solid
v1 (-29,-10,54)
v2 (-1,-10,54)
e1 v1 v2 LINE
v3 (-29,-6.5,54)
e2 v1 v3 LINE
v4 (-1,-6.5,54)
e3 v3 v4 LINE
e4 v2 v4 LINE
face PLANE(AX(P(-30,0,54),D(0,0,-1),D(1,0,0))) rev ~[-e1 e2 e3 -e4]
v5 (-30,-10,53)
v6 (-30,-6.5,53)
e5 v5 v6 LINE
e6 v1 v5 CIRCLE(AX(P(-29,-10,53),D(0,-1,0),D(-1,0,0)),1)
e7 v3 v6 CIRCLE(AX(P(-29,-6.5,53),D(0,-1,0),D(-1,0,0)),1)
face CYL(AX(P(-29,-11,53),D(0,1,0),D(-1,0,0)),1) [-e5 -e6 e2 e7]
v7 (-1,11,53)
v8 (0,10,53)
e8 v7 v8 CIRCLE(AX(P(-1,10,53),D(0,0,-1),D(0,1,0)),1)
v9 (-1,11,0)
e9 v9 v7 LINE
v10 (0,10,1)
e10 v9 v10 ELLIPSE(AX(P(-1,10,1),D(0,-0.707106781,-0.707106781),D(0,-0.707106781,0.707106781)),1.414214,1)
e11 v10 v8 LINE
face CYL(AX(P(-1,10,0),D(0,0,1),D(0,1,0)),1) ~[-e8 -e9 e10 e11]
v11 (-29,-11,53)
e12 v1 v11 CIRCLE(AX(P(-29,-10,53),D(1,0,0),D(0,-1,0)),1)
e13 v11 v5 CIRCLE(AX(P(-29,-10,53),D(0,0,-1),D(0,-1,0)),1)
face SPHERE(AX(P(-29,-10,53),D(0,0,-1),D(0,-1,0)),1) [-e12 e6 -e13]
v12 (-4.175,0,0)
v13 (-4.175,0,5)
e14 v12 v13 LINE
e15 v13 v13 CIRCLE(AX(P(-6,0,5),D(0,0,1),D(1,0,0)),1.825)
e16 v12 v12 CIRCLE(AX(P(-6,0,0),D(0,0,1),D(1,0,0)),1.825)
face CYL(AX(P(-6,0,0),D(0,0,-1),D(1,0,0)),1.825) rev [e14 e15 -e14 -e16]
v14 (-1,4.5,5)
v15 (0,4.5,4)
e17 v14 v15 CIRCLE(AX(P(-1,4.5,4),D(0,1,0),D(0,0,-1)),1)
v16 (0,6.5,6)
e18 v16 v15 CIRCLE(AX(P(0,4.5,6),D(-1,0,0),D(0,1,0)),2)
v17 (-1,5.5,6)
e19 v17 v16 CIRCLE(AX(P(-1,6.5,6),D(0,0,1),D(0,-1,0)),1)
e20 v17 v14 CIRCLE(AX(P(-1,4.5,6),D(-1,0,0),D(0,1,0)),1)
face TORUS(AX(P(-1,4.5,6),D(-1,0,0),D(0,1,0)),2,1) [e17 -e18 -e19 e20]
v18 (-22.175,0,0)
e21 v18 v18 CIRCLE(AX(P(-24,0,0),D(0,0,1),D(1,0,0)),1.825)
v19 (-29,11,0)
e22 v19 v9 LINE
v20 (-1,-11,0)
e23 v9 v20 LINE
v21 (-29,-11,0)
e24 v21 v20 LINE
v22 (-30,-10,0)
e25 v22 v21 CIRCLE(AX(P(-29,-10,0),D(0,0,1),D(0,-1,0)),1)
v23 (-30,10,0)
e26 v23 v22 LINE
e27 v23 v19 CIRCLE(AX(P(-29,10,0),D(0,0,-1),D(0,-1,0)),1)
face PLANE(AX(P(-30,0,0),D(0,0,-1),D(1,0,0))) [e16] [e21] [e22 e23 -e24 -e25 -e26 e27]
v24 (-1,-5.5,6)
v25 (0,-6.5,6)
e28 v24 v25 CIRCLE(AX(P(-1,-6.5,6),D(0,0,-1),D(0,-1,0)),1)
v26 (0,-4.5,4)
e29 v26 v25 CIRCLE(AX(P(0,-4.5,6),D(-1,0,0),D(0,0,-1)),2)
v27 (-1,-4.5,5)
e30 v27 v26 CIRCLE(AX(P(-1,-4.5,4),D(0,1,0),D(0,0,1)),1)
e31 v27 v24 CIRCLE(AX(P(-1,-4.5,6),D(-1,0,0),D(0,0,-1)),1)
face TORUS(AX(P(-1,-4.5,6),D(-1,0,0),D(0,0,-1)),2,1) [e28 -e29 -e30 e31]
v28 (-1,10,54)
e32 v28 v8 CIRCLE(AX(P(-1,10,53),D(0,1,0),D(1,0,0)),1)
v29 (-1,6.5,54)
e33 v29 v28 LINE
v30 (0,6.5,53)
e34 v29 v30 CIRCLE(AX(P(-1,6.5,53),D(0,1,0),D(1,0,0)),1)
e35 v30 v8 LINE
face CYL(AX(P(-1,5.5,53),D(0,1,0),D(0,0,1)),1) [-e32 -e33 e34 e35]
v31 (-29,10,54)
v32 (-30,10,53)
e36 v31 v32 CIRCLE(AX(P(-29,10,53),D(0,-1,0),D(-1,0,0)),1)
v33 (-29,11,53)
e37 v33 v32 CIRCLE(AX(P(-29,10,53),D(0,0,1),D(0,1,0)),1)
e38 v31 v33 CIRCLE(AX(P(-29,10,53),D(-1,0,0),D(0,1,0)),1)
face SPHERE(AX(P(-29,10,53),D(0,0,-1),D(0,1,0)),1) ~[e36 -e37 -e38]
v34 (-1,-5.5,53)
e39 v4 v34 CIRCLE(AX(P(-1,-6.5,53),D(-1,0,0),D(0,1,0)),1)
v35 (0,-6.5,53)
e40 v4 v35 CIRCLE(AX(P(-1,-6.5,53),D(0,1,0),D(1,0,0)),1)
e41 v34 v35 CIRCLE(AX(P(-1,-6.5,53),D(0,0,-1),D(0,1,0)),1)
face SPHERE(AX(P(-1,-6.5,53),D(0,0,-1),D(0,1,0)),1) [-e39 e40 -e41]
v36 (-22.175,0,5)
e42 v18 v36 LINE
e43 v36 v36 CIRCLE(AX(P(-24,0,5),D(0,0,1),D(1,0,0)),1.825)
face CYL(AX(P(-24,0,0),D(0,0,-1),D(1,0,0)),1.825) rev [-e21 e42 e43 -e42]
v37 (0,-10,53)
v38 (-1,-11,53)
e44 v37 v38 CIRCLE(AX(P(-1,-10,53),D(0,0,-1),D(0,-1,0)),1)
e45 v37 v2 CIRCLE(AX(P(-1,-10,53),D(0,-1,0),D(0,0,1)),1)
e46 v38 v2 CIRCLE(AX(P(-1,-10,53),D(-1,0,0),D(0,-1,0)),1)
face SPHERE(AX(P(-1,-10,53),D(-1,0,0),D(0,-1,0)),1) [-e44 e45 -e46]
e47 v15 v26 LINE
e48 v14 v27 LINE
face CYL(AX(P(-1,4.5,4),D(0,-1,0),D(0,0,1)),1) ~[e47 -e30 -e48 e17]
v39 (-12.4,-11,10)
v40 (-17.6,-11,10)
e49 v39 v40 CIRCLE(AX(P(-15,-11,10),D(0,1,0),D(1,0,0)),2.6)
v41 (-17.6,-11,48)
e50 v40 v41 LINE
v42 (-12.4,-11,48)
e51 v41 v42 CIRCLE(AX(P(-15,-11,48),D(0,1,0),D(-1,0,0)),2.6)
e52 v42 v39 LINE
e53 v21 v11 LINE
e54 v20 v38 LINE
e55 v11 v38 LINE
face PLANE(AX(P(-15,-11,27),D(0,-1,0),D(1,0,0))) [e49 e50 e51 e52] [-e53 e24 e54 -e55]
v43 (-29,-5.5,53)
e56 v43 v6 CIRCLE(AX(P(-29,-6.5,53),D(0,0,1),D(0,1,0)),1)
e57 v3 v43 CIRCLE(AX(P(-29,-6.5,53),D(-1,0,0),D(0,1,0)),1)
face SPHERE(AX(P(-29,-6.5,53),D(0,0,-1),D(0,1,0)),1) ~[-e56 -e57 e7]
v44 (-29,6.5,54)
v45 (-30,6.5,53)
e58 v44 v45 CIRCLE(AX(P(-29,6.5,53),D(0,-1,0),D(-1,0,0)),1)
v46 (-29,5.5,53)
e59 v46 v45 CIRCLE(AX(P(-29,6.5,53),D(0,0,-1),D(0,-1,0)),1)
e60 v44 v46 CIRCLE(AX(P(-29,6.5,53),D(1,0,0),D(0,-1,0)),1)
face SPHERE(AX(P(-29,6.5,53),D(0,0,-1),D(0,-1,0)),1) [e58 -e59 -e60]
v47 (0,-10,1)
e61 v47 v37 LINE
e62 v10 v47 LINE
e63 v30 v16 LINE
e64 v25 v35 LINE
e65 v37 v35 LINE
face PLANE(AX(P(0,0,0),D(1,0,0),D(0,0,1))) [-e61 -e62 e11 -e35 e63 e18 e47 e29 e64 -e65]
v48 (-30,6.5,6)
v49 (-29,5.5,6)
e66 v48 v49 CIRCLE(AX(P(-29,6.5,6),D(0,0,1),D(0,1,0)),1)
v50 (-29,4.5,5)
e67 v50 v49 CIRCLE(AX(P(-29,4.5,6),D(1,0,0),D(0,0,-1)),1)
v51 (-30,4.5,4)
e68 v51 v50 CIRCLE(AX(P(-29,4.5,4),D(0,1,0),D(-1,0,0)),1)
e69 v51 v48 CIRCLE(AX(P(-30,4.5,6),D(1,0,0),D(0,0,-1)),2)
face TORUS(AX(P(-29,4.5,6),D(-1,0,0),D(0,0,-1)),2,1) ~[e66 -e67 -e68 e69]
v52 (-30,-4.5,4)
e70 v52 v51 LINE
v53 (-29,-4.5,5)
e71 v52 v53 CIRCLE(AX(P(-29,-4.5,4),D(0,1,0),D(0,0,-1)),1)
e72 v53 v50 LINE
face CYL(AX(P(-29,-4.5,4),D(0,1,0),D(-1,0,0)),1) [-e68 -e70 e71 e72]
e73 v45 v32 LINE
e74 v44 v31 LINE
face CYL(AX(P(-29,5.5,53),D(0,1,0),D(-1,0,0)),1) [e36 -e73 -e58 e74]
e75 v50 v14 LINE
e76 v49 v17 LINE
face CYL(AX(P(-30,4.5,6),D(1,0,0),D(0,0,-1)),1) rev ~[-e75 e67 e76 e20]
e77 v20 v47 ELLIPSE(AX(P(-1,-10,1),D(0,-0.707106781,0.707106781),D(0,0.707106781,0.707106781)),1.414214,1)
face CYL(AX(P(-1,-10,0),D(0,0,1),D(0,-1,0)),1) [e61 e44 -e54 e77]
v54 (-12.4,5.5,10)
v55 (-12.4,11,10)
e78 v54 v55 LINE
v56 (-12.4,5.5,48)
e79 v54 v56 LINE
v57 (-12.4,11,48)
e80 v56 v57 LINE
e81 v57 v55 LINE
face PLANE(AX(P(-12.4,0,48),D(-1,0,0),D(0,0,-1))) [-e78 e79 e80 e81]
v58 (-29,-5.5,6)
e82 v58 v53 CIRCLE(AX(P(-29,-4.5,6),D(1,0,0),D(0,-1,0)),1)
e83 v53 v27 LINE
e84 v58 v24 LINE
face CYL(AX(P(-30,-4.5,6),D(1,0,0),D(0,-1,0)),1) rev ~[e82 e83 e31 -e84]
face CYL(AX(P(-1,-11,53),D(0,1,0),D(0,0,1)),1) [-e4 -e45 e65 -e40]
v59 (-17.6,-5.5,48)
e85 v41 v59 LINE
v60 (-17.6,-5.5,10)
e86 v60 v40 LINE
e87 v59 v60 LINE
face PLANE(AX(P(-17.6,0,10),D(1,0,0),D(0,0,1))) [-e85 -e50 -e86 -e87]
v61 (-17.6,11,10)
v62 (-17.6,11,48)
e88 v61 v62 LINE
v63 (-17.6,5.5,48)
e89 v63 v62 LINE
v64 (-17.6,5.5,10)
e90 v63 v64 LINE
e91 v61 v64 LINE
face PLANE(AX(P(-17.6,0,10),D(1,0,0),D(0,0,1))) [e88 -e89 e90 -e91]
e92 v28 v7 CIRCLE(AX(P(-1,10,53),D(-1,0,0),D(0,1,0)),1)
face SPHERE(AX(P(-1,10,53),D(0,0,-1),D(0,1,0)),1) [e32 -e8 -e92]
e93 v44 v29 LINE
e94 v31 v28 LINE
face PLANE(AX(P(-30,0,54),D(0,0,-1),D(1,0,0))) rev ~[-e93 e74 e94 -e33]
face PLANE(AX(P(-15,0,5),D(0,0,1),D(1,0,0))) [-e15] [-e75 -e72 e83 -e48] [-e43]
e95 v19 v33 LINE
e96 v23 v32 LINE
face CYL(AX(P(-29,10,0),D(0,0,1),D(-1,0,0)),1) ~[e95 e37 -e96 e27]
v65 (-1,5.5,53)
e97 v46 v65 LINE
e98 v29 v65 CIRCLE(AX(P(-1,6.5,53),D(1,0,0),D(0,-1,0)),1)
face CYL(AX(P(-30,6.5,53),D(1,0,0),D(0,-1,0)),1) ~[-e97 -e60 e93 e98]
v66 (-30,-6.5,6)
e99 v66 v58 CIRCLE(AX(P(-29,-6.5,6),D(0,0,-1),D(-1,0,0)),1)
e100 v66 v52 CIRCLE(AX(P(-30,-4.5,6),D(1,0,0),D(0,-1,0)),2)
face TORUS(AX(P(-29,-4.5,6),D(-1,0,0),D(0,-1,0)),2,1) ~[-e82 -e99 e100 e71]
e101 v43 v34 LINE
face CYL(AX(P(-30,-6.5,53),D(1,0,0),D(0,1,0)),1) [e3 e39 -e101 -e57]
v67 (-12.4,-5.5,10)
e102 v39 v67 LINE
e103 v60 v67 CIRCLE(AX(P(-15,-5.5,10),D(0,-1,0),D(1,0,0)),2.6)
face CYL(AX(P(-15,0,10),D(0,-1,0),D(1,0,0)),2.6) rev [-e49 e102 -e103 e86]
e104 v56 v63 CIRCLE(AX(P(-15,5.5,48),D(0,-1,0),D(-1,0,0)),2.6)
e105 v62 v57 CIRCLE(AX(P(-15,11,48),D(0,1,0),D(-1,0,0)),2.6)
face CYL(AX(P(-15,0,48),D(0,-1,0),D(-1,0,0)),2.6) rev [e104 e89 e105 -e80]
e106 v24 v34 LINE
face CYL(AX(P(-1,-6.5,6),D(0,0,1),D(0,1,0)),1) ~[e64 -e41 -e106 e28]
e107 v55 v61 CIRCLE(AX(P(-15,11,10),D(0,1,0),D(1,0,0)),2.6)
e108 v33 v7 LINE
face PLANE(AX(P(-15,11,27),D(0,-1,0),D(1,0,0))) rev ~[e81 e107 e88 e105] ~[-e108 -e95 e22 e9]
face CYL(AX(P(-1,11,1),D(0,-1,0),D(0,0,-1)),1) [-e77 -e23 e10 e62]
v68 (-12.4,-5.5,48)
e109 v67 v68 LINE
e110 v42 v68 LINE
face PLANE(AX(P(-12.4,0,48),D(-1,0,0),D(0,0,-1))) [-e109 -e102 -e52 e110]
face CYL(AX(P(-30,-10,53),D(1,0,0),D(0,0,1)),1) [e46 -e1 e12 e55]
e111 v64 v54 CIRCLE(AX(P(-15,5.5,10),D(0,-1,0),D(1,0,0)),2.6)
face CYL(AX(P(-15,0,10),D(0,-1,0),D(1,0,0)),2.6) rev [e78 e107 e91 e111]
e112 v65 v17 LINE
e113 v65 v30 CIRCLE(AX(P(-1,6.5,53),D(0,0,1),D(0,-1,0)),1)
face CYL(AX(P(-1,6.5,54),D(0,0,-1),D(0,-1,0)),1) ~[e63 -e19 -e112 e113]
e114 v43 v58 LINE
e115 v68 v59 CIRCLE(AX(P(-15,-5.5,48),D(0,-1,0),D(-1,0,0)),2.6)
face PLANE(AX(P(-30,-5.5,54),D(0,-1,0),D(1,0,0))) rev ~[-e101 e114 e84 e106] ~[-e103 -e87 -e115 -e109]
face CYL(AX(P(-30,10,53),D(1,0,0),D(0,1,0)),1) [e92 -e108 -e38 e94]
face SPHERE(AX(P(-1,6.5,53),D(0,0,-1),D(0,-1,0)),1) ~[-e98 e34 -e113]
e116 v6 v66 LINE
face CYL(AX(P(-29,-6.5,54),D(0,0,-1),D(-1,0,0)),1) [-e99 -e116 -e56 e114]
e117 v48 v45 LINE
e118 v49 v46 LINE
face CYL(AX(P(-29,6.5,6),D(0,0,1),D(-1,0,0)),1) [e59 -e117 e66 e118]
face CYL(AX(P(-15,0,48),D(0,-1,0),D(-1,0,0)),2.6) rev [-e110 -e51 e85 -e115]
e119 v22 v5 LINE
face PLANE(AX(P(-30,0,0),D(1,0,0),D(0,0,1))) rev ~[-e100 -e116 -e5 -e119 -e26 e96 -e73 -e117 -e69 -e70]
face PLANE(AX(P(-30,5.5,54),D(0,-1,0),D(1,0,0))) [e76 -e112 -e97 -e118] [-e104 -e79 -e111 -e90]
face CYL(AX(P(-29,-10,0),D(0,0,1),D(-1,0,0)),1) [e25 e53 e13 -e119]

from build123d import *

# Parameters (mm, degrees)
F0_W     = 30
F0_H     = 54
F1_DEPTH = 11
F2_W     = 30
F2_H     = 11
F3_DEPTH = 49
F4_R     = 1.825
F5_DEPTH = 5
F6_F1_R  = 1
F6_F2_R  = 1


with BuildPart() as f1:
    # F0 (on Front) → F1 (new body, symmetric)
    with BuildSketch(Plane.XZ):
        with Locations((-15, 27)):
            Rectangle(F0_W, F0_H)
        with BuildLine():
            Line((-17.6, 10), (-17.6, 48))
            ThreePointArc((-17.6, 48), (-15, 50.6), (-12.4, 48))
            Line((-12.4, 48), (-12.4, 10))
            ThreePointArc((-12.4, 10), (-15, 7.4), (-17.6, 10))
        make_face(mode=Mode.SUBTRACT)
    extrude(amount=F1_DEPTH, both=True)

    # F2 (on face) → F3 (cut, through all)
    with BuildSketch(Plane.XY.offset(54)):
        with Locations((-15, 0)):
            Rectangle(F2_W, F2_H)
    extrude(amount=-F3_DEPTH, mode=Mode.SUBTRACT)

    # F4 (on Top) → F5 (cut, through all)
    with BuildSketch(Plane.XY):
        with Locations((-24, 0)):
            Circle(F4_R)
        with Locations((-6, 0)):
            Circle(F4_R)
    extrude(amount=F5_DEPTH, mode=Mode.SUBTRACT)

    # F6: fillet of radius 1 on 19 edges, made by hand

    # F6_f1
    f6_f1_edges = [f1.edges().sort_by_distance(p)[0] for p in [
        (-15, -5.5, 5),
        (-15, 5.5, 5),
    ]]
    fillet(f6_f1_edges, radius=F6_F1_R)

    # F6_f2
    f6_f2_edges = [f1.edges().sort_by_distance(p)[0] for p in [
        (-30, -11, 27),
        (-30, -5.5, 30),
        (-30, 5.5, 30),
        (0, 5.5, 30),
        (0, 11, 27),
        (-30, 11, 27),
        (-15, 11, 54),
        (-15, 5.5, 54),
        (-15, -11, 54),
        (-15, -5.5, 54),
        (0, -5.5, 30),
        (0, -11, 27),
        (0, -8.25, 54),
        (0, 8.25, 54),
        (0, 0, 0),
        (-30, -8.25, 54),
        (-30, 8.25, 54),
        (0, -5.2071067812, 5.2928932188),
        (0, 5.2071067812, 5.2928932188),
        (-30, 5.2071067812, 5.2928932188),
        (-30, -5.2071067812, 5.2928932188),
    ]]
    fillet(f6_f2_edges, radius=F6_F2_R)


solid = f1.part
